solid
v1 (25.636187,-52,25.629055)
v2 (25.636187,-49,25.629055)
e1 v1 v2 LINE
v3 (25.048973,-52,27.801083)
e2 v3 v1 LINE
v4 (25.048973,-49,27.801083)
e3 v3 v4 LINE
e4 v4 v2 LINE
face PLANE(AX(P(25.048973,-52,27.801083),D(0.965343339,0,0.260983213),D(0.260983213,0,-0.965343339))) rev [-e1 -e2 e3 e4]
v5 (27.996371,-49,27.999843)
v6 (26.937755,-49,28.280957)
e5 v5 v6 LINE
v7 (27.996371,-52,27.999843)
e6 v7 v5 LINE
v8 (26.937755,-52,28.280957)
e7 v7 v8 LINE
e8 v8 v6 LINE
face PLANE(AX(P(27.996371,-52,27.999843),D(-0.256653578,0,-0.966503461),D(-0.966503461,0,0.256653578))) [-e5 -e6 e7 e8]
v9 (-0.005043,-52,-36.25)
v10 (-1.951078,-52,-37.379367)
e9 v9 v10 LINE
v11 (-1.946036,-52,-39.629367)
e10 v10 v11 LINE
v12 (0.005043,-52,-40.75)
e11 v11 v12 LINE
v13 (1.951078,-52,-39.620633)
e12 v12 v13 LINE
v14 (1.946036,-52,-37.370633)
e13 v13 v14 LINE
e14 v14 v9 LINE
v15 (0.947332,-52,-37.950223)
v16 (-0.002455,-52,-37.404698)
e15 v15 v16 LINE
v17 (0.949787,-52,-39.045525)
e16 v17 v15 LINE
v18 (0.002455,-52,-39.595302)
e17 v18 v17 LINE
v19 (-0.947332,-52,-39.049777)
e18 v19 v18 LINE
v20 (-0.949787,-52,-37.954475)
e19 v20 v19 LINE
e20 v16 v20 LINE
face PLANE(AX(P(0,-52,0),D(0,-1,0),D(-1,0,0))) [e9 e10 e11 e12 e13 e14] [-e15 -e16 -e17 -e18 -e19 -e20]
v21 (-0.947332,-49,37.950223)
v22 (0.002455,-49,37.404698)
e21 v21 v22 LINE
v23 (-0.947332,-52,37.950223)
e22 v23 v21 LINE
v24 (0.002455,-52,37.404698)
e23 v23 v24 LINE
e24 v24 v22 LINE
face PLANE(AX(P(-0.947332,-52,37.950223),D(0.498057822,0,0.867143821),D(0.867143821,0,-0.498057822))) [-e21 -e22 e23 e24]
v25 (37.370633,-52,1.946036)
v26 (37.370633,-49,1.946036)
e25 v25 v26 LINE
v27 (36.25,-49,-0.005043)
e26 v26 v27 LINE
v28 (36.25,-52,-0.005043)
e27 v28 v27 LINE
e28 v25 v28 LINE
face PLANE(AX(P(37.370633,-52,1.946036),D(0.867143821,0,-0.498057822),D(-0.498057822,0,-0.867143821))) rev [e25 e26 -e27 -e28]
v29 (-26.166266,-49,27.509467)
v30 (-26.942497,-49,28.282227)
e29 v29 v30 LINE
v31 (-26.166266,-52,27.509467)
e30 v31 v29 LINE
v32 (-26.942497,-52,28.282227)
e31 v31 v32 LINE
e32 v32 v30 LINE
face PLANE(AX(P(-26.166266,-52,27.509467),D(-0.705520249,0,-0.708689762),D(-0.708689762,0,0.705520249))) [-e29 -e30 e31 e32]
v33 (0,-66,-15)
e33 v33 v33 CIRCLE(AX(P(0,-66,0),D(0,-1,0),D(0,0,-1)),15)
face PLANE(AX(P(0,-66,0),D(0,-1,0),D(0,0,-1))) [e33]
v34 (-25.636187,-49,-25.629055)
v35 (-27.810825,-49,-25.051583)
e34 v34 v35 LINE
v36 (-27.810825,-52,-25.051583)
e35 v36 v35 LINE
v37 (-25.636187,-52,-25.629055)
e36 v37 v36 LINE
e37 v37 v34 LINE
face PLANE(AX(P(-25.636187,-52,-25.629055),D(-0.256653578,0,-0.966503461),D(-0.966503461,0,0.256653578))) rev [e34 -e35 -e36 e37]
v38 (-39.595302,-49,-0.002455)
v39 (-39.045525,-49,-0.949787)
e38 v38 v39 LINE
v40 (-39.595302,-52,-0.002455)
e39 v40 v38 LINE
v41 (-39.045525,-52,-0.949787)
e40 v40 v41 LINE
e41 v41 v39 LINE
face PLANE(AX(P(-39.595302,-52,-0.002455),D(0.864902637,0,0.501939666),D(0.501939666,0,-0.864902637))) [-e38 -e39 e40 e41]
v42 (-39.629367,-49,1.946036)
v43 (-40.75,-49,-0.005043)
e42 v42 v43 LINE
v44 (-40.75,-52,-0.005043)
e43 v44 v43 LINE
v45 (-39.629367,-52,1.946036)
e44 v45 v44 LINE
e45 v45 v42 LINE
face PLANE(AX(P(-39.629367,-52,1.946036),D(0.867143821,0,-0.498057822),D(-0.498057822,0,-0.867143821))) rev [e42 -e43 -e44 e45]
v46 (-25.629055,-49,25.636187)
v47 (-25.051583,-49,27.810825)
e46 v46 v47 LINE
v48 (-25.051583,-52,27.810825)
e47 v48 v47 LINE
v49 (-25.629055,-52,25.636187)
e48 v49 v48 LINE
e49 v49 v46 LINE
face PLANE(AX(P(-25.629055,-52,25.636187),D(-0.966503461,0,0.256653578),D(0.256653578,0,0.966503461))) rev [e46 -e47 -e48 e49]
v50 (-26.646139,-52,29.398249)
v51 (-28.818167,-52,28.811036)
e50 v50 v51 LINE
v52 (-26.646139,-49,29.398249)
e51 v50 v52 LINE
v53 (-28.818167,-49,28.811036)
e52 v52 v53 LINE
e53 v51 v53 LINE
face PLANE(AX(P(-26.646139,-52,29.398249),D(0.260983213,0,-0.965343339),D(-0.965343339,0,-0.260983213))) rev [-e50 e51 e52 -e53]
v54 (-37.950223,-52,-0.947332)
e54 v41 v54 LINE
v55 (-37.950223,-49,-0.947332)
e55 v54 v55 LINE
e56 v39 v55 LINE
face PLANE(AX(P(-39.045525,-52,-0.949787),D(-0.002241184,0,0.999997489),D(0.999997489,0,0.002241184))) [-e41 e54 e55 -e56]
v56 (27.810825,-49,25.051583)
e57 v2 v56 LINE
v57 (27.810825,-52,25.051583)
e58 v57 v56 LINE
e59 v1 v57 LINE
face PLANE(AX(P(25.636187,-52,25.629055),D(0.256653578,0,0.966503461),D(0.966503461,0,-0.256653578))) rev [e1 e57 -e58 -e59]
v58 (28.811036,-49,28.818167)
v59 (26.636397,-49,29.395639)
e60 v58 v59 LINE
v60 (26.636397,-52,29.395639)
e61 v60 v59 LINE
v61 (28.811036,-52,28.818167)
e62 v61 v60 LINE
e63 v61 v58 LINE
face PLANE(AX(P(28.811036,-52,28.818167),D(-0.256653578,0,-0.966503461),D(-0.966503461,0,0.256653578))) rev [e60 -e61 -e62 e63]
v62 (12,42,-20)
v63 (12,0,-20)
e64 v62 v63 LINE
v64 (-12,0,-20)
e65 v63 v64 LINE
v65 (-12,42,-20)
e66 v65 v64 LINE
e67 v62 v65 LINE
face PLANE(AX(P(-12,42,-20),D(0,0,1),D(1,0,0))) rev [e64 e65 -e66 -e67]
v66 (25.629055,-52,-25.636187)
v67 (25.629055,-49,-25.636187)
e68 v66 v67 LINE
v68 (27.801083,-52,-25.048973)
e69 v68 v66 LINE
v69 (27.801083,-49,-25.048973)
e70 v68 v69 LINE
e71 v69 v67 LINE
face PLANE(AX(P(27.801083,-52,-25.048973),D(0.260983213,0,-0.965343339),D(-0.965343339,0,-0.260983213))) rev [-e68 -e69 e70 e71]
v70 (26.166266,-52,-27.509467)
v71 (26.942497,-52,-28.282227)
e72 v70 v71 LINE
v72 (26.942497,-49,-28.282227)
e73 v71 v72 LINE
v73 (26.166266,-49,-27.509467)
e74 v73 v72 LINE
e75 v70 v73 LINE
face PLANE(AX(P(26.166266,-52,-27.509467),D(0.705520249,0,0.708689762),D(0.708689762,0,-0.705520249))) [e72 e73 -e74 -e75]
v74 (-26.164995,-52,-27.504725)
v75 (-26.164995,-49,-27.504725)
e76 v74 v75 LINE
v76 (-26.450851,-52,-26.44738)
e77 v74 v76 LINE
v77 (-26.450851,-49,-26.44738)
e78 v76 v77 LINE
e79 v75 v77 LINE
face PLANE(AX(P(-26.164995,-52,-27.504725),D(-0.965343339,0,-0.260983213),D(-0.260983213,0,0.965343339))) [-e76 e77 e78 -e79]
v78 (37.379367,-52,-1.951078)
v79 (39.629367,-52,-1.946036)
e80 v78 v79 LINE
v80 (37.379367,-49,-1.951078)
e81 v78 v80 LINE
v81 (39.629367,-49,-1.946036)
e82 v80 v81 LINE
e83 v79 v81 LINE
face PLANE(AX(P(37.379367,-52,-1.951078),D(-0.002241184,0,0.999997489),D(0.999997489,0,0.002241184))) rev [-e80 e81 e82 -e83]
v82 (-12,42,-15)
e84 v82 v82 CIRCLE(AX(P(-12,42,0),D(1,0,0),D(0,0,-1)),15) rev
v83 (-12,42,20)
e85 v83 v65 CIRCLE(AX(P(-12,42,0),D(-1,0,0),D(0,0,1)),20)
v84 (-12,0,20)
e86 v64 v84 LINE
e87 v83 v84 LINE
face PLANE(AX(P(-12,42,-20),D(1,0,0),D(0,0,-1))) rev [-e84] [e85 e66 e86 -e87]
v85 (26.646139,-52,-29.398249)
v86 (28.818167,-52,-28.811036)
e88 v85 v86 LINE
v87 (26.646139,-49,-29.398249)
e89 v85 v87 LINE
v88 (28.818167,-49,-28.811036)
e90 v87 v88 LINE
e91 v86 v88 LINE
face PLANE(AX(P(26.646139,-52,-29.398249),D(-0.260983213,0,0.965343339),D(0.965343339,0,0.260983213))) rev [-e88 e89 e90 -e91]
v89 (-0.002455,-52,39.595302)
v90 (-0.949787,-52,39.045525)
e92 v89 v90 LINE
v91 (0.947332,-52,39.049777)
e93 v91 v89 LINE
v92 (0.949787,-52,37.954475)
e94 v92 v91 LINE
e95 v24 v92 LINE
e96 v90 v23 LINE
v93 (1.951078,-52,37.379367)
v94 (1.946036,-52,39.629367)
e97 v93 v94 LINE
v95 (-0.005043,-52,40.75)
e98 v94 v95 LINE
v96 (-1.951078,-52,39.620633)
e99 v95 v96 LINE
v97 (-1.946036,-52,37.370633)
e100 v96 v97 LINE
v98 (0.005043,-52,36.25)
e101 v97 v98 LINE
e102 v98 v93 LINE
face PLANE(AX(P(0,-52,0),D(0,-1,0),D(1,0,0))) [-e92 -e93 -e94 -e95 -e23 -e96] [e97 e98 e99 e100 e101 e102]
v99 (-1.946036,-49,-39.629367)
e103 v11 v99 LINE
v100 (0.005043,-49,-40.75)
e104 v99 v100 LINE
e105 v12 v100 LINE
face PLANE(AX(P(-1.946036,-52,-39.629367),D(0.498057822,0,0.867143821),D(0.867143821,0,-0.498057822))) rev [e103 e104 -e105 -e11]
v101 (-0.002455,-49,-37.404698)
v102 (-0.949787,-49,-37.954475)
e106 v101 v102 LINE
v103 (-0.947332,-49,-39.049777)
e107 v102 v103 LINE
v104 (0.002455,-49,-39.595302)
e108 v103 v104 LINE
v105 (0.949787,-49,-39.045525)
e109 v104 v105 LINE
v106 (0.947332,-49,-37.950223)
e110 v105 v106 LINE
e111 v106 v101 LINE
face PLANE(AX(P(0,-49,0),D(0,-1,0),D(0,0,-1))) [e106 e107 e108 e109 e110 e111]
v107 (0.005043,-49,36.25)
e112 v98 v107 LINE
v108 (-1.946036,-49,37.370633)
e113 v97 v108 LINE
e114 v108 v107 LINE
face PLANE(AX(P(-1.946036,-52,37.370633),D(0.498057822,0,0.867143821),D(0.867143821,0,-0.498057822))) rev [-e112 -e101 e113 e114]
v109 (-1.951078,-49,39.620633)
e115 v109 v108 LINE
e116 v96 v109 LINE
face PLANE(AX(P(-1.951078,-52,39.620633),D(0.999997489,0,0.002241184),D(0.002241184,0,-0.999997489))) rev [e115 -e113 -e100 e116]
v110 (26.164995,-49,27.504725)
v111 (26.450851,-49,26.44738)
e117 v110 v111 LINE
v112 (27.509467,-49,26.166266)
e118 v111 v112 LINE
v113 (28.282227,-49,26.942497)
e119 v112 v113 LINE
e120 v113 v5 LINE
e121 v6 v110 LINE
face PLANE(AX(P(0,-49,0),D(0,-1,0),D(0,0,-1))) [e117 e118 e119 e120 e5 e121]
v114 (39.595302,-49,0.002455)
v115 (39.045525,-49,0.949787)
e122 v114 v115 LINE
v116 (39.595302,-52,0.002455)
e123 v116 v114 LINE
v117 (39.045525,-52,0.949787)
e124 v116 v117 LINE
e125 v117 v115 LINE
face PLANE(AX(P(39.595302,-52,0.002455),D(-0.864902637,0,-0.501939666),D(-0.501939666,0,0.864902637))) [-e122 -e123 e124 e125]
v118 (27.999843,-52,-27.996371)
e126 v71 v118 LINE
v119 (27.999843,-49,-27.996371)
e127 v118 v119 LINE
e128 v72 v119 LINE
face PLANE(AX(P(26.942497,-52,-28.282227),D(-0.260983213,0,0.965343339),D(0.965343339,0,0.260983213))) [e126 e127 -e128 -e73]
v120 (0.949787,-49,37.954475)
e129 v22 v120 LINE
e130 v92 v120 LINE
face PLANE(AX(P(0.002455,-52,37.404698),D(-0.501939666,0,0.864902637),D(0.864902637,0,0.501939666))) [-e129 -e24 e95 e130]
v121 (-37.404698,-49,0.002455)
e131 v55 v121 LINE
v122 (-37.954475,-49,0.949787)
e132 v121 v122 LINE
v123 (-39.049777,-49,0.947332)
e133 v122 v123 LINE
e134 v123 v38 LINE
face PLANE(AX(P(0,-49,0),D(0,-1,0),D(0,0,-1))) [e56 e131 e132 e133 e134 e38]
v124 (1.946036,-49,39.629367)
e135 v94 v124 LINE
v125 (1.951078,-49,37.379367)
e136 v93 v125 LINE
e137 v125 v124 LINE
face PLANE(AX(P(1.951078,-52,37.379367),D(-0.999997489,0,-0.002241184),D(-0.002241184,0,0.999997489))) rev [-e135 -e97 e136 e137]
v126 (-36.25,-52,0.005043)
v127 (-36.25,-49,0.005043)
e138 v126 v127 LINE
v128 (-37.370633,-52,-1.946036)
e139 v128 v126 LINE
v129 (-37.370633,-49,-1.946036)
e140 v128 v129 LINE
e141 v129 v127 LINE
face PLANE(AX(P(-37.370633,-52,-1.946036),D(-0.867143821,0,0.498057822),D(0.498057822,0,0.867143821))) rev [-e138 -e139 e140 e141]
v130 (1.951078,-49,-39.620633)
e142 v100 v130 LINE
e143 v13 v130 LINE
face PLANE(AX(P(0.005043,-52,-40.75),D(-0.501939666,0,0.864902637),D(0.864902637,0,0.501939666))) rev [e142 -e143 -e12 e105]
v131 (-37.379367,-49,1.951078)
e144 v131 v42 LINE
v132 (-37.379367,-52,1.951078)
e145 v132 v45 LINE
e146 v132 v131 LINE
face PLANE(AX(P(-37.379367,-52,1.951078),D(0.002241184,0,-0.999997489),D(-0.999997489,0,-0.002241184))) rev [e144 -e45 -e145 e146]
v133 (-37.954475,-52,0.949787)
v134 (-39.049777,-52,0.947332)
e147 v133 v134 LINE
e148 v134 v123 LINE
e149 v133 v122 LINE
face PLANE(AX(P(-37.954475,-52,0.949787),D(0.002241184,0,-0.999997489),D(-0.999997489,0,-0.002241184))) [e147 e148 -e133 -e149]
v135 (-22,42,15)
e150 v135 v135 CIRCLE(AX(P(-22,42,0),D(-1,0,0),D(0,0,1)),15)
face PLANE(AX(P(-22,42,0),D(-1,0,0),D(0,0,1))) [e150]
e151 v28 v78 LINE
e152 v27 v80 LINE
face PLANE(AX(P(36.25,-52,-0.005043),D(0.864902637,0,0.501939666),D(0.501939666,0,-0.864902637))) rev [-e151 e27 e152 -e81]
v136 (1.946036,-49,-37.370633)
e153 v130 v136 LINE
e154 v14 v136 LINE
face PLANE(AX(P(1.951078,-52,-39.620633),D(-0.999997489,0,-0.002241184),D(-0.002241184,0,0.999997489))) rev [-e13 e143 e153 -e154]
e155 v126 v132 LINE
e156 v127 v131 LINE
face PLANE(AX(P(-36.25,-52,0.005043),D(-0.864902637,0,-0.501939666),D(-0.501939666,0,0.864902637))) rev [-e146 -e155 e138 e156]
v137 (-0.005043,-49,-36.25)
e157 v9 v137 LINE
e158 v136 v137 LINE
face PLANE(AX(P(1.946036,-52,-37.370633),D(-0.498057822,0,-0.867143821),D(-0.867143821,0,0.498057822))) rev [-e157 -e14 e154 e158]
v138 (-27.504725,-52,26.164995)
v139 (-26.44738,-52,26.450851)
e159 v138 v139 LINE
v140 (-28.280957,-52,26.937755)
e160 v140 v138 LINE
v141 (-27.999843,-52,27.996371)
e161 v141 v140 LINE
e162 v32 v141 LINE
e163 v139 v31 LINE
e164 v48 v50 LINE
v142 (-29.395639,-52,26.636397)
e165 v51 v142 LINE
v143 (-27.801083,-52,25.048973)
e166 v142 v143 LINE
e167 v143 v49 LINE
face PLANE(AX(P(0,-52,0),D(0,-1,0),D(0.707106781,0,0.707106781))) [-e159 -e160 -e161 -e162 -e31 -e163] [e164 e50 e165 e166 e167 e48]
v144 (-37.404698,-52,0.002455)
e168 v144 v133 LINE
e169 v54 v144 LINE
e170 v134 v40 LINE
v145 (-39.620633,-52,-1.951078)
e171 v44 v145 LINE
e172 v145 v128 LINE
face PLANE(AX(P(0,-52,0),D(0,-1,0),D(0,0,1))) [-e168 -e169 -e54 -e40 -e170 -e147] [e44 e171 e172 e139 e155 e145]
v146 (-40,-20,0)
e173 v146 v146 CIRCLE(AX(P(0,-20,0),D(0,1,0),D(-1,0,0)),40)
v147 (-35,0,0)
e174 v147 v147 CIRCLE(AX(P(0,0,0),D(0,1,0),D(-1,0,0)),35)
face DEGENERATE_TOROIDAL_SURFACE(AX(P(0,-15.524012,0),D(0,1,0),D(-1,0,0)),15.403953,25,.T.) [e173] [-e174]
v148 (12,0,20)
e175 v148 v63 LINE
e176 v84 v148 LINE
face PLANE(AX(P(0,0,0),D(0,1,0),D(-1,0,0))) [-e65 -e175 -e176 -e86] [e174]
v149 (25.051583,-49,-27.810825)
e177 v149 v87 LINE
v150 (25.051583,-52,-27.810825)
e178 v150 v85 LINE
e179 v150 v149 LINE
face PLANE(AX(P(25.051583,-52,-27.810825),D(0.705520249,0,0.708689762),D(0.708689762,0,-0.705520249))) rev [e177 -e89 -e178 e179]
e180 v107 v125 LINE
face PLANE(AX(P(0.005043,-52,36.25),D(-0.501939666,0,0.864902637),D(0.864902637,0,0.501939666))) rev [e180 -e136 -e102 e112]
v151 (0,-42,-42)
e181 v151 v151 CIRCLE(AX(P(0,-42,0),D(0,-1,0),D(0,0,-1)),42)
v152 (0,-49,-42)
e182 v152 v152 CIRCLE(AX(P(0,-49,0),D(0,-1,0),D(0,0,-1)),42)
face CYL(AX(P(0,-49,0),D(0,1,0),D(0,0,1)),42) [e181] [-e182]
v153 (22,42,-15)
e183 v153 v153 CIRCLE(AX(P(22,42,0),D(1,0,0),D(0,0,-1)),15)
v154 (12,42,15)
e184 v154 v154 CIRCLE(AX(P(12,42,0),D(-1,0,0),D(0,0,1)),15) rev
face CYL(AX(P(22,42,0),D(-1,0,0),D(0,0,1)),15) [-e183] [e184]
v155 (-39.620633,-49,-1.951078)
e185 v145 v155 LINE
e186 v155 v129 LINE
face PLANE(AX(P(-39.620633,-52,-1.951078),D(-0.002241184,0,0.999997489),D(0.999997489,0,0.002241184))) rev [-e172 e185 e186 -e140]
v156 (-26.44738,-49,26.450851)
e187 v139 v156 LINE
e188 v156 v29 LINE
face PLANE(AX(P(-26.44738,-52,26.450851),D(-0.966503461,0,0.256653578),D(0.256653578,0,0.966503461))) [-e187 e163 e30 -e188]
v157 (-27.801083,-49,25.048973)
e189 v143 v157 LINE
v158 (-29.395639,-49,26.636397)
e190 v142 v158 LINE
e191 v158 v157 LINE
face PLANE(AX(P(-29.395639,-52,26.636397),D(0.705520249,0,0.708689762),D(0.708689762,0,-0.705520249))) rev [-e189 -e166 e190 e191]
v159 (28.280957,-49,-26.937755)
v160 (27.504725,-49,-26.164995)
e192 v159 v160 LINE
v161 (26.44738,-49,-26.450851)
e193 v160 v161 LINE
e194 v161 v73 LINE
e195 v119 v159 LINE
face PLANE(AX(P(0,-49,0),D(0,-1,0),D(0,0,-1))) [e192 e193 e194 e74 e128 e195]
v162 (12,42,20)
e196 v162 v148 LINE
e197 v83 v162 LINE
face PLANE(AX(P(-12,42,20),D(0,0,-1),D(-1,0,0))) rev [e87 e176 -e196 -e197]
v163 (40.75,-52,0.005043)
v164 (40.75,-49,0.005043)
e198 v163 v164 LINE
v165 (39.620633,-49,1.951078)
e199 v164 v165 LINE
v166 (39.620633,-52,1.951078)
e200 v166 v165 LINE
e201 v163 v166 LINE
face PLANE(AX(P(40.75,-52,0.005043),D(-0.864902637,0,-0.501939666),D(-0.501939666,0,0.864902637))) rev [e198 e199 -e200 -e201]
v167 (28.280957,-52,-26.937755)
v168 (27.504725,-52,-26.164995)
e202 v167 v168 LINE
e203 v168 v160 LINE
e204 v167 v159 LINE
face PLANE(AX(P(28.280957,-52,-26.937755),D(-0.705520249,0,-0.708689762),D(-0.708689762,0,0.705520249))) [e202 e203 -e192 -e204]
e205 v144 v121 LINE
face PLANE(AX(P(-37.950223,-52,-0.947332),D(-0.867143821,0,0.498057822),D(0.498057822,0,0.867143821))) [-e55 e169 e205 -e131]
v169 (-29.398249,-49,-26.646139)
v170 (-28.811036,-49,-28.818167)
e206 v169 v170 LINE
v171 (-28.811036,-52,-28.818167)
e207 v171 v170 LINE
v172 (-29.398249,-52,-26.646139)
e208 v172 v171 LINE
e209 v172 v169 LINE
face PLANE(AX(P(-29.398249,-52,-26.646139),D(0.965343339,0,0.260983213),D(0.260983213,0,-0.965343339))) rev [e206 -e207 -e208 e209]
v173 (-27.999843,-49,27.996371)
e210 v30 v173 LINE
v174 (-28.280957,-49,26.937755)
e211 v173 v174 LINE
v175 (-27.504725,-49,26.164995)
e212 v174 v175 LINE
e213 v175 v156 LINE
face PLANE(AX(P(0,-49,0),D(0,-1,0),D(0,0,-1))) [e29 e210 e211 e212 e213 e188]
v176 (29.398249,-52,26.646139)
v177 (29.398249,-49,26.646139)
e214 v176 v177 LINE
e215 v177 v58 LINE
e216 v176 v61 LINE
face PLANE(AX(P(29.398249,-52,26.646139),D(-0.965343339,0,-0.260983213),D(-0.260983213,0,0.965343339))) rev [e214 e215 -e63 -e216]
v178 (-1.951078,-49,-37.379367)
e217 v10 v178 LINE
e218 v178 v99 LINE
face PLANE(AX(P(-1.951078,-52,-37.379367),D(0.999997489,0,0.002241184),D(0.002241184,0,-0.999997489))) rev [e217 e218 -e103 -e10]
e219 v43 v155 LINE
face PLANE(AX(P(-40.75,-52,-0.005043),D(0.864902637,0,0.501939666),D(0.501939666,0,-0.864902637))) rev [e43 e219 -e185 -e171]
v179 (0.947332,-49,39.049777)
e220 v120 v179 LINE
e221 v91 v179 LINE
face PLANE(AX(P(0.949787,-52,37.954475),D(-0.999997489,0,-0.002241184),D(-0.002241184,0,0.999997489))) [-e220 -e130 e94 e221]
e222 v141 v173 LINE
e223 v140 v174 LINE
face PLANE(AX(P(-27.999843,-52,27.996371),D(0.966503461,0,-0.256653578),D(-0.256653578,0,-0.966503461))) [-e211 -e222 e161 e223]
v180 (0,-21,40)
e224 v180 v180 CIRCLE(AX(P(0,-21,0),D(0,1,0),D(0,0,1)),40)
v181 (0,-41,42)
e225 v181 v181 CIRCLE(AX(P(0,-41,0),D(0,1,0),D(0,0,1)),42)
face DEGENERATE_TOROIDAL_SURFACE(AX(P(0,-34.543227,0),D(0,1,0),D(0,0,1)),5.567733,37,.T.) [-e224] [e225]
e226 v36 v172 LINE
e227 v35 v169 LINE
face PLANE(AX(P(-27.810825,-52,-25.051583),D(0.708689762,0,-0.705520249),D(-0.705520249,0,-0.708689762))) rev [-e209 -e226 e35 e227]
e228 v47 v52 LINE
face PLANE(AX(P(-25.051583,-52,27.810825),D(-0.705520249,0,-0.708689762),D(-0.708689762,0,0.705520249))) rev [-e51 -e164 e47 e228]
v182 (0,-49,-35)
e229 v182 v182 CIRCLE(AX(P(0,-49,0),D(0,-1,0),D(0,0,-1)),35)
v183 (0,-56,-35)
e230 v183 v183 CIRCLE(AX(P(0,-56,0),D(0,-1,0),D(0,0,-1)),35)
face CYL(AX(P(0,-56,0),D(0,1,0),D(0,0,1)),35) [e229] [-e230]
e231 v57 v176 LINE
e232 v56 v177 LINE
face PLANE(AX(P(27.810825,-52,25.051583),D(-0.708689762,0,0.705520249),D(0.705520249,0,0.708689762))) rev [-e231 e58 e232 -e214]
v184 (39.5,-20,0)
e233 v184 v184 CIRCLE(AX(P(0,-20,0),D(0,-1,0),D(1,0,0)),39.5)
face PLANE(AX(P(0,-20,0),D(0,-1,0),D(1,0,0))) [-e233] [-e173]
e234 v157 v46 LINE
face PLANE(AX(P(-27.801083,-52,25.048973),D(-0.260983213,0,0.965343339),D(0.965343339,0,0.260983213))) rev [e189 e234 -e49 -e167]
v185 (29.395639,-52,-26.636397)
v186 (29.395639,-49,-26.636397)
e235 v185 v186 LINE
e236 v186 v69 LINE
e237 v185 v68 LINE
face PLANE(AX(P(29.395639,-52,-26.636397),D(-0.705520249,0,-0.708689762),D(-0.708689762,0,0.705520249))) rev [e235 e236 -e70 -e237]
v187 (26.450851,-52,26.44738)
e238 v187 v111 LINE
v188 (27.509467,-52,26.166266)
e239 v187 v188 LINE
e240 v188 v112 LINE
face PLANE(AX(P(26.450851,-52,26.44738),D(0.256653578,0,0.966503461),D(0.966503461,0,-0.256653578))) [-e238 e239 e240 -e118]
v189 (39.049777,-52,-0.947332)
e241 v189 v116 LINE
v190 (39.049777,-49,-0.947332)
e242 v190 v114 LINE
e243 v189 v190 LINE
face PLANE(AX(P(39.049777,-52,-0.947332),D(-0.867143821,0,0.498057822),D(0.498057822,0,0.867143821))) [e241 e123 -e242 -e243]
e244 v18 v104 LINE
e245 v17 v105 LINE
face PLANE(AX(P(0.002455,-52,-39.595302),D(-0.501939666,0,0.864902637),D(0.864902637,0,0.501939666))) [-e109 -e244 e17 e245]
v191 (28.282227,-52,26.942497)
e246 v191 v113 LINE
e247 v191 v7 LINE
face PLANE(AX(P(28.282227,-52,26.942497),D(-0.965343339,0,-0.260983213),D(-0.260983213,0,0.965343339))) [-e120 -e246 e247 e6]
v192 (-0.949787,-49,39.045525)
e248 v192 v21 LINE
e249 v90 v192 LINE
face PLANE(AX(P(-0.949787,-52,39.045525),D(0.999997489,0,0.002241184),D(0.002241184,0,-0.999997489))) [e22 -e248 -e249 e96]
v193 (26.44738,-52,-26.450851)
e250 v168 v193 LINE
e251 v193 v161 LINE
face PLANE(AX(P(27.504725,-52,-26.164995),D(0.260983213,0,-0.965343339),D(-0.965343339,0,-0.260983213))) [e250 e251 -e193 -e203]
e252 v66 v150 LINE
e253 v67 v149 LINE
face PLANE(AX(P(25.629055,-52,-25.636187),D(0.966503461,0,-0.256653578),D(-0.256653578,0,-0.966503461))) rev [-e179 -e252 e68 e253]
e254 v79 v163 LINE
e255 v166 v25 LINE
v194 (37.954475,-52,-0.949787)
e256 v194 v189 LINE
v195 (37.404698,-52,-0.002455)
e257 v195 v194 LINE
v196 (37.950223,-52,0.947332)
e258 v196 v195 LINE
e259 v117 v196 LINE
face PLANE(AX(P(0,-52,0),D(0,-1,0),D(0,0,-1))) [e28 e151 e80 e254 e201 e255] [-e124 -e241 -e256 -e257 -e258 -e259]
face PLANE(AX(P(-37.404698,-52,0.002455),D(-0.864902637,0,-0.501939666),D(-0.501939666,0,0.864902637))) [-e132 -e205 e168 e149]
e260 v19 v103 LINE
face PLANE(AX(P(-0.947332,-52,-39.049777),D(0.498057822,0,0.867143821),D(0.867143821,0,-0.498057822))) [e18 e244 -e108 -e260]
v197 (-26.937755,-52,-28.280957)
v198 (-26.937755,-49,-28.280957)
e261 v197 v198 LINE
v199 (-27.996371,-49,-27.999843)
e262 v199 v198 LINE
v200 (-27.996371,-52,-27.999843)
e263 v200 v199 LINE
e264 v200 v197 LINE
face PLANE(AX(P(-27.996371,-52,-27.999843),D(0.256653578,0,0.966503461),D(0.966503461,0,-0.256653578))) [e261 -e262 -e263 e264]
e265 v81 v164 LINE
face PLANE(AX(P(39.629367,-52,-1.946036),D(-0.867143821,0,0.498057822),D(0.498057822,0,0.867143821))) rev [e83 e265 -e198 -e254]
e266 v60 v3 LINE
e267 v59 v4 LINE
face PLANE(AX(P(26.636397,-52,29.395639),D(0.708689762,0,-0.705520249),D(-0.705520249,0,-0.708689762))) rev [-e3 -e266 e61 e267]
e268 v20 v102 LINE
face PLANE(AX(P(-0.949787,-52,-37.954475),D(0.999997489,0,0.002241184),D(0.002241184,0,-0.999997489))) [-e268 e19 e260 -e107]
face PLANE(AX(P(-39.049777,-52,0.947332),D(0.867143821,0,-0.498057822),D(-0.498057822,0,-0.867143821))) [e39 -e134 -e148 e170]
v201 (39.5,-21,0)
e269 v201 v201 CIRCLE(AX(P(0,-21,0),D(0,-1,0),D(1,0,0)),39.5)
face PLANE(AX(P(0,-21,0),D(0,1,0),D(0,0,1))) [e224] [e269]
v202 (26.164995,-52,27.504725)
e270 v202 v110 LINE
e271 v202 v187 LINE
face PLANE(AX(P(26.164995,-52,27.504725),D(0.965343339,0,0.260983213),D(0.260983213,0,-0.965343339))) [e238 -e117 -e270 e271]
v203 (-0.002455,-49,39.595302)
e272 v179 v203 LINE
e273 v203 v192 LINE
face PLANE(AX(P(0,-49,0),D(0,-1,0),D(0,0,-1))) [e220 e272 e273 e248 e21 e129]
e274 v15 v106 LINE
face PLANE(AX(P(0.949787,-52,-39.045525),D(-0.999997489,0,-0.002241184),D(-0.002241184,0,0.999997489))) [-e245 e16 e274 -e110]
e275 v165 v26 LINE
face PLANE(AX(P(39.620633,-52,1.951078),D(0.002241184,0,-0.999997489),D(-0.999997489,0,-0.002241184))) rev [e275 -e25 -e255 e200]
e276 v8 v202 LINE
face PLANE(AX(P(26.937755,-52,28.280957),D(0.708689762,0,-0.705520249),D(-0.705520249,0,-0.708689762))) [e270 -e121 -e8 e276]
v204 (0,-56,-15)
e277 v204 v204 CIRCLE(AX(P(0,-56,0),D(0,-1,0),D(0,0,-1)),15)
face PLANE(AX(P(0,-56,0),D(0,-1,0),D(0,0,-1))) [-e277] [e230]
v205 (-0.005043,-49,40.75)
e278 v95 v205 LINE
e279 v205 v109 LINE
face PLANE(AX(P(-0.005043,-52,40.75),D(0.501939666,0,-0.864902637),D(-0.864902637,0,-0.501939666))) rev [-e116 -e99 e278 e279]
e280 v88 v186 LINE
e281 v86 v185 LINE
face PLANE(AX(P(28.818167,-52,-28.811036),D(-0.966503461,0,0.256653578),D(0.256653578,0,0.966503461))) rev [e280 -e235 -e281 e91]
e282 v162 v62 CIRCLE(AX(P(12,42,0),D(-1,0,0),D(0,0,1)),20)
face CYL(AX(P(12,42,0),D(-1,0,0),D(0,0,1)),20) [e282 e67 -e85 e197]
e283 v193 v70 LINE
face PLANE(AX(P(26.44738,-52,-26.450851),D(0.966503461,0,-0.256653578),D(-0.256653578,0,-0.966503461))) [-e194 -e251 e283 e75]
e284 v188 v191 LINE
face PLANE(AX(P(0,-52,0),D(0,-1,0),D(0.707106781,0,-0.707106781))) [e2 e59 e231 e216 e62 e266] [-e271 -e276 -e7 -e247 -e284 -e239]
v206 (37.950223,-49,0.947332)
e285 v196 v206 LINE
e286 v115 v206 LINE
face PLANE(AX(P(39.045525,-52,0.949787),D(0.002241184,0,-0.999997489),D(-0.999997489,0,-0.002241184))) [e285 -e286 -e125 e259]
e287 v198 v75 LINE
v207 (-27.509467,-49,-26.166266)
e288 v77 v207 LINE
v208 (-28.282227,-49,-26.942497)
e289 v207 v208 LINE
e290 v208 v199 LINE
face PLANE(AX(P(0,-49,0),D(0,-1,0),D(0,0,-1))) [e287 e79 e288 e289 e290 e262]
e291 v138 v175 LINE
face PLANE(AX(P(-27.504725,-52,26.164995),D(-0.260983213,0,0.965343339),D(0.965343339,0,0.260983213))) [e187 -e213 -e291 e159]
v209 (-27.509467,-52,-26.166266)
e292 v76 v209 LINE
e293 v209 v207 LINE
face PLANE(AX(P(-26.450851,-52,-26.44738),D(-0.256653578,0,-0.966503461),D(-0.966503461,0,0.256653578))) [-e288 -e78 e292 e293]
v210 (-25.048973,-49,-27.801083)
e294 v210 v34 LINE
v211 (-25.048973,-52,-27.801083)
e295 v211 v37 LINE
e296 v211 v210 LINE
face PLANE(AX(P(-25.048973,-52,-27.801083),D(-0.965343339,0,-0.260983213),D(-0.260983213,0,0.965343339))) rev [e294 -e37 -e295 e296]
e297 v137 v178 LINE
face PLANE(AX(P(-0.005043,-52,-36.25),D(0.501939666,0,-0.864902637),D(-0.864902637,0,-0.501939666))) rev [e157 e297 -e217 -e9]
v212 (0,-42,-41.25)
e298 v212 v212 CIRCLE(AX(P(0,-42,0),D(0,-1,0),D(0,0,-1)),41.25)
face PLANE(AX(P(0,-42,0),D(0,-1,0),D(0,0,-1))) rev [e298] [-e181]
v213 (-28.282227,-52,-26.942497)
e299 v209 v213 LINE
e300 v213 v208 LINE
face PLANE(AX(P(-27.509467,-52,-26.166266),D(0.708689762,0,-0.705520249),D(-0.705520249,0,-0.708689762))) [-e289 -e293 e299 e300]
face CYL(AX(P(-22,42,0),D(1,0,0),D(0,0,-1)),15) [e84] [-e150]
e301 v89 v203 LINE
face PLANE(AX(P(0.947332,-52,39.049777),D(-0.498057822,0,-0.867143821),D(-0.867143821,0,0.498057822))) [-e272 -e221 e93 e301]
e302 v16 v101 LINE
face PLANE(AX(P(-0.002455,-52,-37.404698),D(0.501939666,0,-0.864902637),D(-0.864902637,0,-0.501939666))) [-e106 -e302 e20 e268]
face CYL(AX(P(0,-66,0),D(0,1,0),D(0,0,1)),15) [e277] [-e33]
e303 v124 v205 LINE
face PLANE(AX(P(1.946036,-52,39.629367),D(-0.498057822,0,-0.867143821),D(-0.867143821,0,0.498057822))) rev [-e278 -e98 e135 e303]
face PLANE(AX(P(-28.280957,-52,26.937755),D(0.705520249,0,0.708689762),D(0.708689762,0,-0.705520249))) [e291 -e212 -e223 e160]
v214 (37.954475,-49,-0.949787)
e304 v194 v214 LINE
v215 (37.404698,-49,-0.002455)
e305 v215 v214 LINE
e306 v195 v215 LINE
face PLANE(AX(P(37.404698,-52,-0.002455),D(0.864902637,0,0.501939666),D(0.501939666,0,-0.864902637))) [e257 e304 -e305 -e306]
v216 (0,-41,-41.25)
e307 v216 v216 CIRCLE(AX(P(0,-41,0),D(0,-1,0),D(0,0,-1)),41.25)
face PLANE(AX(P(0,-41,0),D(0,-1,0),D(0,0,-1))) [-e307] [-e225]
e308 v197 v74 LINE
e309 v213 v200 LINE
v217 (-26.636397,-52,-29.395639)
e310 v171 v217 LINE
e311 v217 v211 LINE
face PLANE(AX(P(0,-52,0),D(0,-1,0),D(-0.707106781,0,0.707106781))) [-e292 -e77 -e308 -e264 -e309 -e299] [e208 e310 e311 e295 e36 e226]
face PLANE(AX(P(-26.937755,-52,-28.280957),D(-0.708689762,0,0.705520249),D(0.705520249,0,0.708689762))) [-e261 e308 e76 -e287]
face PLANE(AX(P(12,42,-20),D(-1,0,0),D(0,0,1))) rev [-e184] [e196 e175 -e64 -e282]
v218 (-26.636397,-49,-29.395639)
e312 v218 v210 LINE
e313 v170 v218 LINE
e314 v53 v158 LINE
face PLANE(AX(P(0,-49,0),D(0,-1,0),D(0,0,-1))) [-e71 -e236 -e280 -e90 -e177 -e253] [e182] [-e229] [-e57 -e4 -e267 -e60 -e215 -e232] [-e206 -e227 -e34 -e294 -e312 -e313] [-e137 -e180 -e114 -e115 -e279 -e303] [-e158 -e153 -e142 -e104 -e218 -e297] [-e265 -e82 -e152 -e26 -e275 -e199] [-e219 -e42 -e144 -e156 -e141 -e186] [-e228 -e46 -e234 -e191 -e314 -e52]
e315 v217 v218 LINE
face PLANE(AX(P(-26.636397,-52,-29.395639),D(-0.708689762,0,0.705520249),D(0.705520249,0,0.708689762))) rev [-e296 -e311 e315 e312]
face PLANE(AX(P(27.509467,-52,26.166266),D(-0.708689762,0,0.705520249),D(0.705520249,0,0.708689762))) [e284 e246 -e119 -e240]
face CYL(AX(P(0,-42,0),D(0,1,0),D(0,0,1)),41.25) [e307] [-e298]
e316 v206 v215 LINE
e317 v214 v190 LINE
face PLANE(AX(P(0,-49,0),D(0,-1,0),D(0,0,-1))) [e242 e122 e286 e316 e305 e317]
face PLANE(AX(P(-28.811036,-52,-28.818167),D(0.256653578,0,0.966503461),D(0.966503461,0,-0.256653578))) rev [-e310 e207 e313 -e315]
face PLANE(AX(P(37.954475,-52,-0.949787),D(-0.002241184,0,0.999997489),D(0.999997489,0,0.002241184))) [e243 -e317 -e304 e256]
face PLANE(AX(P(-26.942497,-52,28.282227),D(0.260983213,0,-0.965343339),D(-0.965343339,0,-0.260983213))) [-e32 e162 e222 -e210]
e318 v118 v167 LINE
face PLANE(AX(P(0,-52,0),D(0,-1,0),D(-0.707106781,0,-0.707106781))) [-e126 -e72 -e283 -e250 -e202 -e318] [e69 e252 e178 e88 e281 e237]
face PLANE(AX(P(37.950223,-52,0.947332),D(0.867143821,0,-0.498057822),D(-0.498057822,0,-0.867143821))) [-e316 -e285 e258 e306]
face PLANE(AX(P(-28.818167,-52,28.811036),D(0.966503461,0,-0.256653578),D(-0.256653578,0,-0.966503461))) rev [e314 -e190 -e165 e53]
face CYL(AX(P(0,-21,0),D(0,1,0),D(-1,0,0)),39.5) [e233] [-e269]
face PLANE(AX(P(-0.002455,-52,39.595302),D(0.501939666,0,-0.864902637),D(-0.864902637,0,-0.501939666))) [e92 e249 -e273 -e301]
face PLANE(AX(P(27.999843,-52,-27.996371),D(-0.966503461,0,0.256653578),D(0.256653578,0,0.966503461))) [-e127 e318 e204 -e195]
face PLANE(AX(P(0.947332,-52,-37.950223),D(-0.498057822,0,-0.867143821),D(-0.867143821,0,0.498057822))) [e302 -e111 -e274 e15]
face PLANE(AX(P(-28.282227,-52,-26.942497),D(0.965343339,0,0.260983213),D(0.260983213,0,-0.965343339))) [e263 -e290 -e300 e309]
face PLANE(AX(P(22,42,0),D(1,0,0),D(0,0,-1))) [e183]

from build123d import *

# Parameters (mm, degrees)
ESQUISSE2_R                  = 39.5
BOSS_EXTRU_1_DEPTH           = 1
ESQUISSE4_R                  = 41.25
BOSS_EXTRU_2_DEPTH           = 1
ESQUISSE5_R                  = 42
BOSS_EXTRU_3_DEPTH           = 7
ESQUISSE6_R                  = 35
BOSS_EXTRU_4_DEPTH           = 7
BOSS_EXTRU_7_DEPTH           = 3
R_P_TITION_START             = -52
R_P_TITION_CIRCULAIRE1_DEPTH = 3
ESQUISSE8_R                  = 15
BOSS_EXTRU_8_DEPTH           = 10
ESQUISSE9_W                  = 24
ESQUISSE9_H                  = 40
BOSS_EXTRU_9_DEPTH           = 42
BOSS_EXTRU_10_DEPTH          = 24
ESQUISSE11_R                 = 15
BOSS_EXTRU_11_DEPTH          = 10
BOSS_EXTRU_12_START          = 10
ESQUISSE12_R                 = 15
BOSS_EXTRU_12_DEPTH          = 10


# Read off the part's stored shape, not the designer's step: Répétition circulaire1
with BuildPart() as part:
    # Esquisse1 → Révolution1 (revolve)
    with BuildSketch(Plane.XY):
        with BuildLine():
            Line((0, 0), (-35, 0))
            ThreePointArc((-35, 0), (-39.657515479, -9.46062113), (-40, -20))
            Line((-40, -20), (0, -20))
            Line((0, -20), (0, 0))
        make_face()
    revolve(axis=Axis((0, 0, 0), (0, -1, 0)))

    # Esquisse2 → Boss.-Extru.1 (add)
    with BuildSketch(Plane.XZ.offset(20)):
        Circle(ESQUISSE2_R)
    extrude(amount=BOSS_EXTRU_1_DEPTH)

    # Esquisse3 → Révolution2 (revolve)
    with BuildSketch(Plane(origin=(0, 0, 0), x_dir=(0, 0, -1), z_dir=(1, 0, 0)), mode=Mode.PRIVATE) as r_volution2_sk:
        with BuildLine():
            Line((0, -21), (-40, -21))
            ThreePointArc((-40, -21), (-42.384109041, -30.861589096), (-42, -41))
            Line((-42, -41), (0, -41))
            Line((0, -41), (0, -21))
        make_face()
    revolve(r_volution2_sk.sketch.rotate(Axis((0, -21, 0), (0, -1, 0)), 90), axis=Axis((0, -21, 0), (0, -1, 0)))

    # Esquisse4 → Boss.-Extru.2 (add)
    with BuildSketch(Plane.XZ.offset(41)):
        with Locations(Location((0, 0, 0), (0, 0, 270))):
            Circle(ESQUISSE4_R)
    extrude(amount=BOSS_EXTRU_2_DEPTH)

    # Esquisse5 → Boss.-Extru.3 (add)
    with BuildSketch(Plane.XZ.offset(42)):
        with Locations(Location((0, 0, 0), (0, 0, 270))):
            Circle(ESQUISSE5_R)
    extrude(amount=BOSS_EXTRU_3_DEPTH)

    # Esquisse6 → Boss.-Extru.4 (add)
    with BuildSketch(Plane.XZ.offset(49)):
        with Locations(Location((0, 0, 0), (0, 0, 270))):
            Circle(ESQUISSE6_R)
    extrude(amount=BOSS_EXTRU_4_DEPTH)

    # Esquisse7 → Boss.-Extru.7 (add)
    with BuildSketch(Plane.XZ.offset(49)):
        Polygon((39.629367086, -1.94603582), (40.75, 0.005042677), (39.620632914, 1.951078497), (37.370632914, 1.94603582), (36.25, -0.005042677), (37.379367086, -1.951078497), align=None)
        Polygon((39.045525279, 0.94978706), (37.950222917, 0.94733228), (37.404697638, -0.00245478), (37.954474721, -0.94978706), (39.049777083, -0.94733228), (39.595302362, 0.00245478), align=None, mode=Mode.SUBTRACT)
    extrude(amount=BOSS_EXTRU_7_DEPTH)

    # Répétition circulaire1 outline → Répétition circulaire1 (add)
    # profile 1 of 7: a face of its own
    with BuildSketch(Plane(origin=(0, 0, 0), x_dir=(1, 0, 0), z_dir=(0, 1, 0)).offset(R_P_TITION_START)):
        Polygon((29.398249326, -26.646139076), (27.810824779, -25.051583107), (25.636186529, -25.629055107), (25.048972826, -27.801083076), (26.636397373, -29.395639044), (28.811035623, -28.818167044), align=None)
        Polygon((28.282227258, -26.9424971), (27.996371011, -27.999842595), (26.937754829, -28.28095657), (26.164994893, -27.504725051), (26.45085114, -26.447379557), (27.509467323, -26.166265581), align=None, mode=Mode.SUBTRACT)
    # profile 2 of 7: a face of its own
    with BuildSketch(Plane(origin=(0, 0, 0), x_dir=(1, 0, 0), z_dir=(0, 1, 0)).offset(R_P_TITION_START)):
        Polygon((26.646139076, 29.398249326), (25.051583107, 27.810824779), (25.629055107, 25.636186529), (27.801083076, 25.048972826), (29.395639044, 26.636397373), (28.818167044, 28.811035623), align=None)
        Polygon((26.9424971, 28.282227258), (27.999842595, 27.996371011), (28.28095657, 26.937754829), (27.504725051, 26.164994893), (26.447379557, 26.45085114), (26.166265581, 27.509467323), align=None, mode=Mode.SUBTRACT)
    # profile 3 of 7: a face of its own
    with BuildSketch(Plane(origin=(0, 0, 0), x_dir=(1, 0, 0), z_dir=(0, 1, 0)).offset(R_P_TITION_START)):
        Polygon((-1.94603582, 39.629367086), (-1.951078497, 37.379367086), (-0.005042677, 36.25), (1.94603582, 37.370632914), (1.951078497, 39.620632914), (0.005042677, 40.75), align=None)
        Polygon((-0.94733228, 39.049777083), (0.00245478, 39.595302362), (0.94978706, 39.045525279), (0.94733228, 37.950222917), (-0.00245478, 37.404697638), (-0.94978706, 37.954474721), align=None, mode=Mode.SUBTRACT)
    # profile 4 of 7: a face of its own
    with BuildSketch(Plane(origin=(0, 0, 0), x_dir=(1, 0, 0), z_dir=(0, 1, 0)).offset(R_P_TITION_START)):
        Polygon((-29.398249326, 26.646139076), (-27.810824779, 25.051583107), (-25.636186529, 25.629055107), (-25.048972826, 27.801083076), (-26.636397373, 29.395639044), (-28.811035623, 28.818167044), align=None)
        Polygon((-28.282227258, 26.9424971), (-27.996371011, 27.999842595), (-26.937754829, 28.28095657), (-26.164994893, 27.504725051), (-26.45085114, 26.447379557), (-27.509467323, 26.166265581), align=None, mode=Mode.SUBTRACT)
    # profile 5 of 7: a face of its own
    with BuildSketch(Plane(origin=(0, 0, 0), x_dir=(1, 0, 0), z_dir=(0, 1, 0)).offset(R_P_TITION_START)):
        Polygon((-39.629367086, -1.94603582), (-37.379367086, -1.951078497), (-36.25, -0.005042677), (-37.370632914, 1.94603582), (-39.620632914, 1.951078497), (-40.75, 0.005042677), align=None)
        Polygon((-39.049777083, -0.94733228), (-39.595302362, 0.00245478), (-39.045525279, 0.94978706), (-37.950222917, 0.94733228), (-37.404697638, -0.00245478), (-37.954474721, -0.94978706), align=None, mode=Mode.SUBTRACT)
    # profile 6 of 7: a face of its own
    with BuildSketch(Plane(origin=(0, 0, 0), x_dir=(1, 0, 0), z_dir=(0, 1, 0)).offset(R_P_TITION_START)):
        Polygon((-26.646139076, -29.398249326), (-25.051583107, -27.810824779), (-25.629055107, -25.636186529), (-27.801083076, -25.048972826), (-29.395639044, -26.636397373), (-28.818167044, -28.811035623), align=None)
        Polygon((-26.9424971, -28.282227258), (-27.999842595, -27.996371011), (-28.28095657, -26.937754829), (-27.504725051, -26.164994893), (-26.447379557, -26.45085114), (-26.166265581, -27.509467323), align=None, mode=Mode.SUBTRACT)
    # profile 7 of 7: a face of its own
    with BuildSketch(Plane(origin=(0, 0, 0), x_dir=(1, 0, 0), z_dir=(0, 1, 0)).offset(R_P_TITION_START)):
        Polygon((1.94603582, -39.629367086), (1.951078497, -37.379367086), (0.005042677, -36.25), (-1.94603582, -37.370632914), (-1.951078497, -39.620632914), (-0.005042677, -40.75), align=None)
        Polygon((0.94733228, -39.049777083), (-0.00245478, -39.595302362), (-0.94978706, -39.045525279), (-0.94733228, -37.950222917), (0.00245478, -37.404697638), (0.94978706, -37.954474721), align=None, mode=Mode.SUBTRACT)
    extrude(amount=R_P_TITION_CIRCULAIRE1_DEPTH)

    # Esquisse8 → Boss.-Extru.8 (add)
    with BuildSketch(Plane.XZ.offset(56)):
        with Locations(Location((0, 0, 0), (0, 0, 270))):
            Circle(ESQUISSE8_R)
    extrude(amount=BOSS_EXTRU_8_DEPTH)

    # Esquisse9 → Boss.-Extru.9 (add)
    with BuildSketch(Plane(origin=(0, 0, 0), x_dir=(1, 0, 0), z_dir=(0, 1, 0))):
        Rectangle(ESQUISSE9_W, ESQUISSE9_H)
    extrude(amount=BOSS_EXTRU_9_DEPTH)

    # Esquisse10 → Boss.-Extru.10 (add)
    with BuildSketch(Plane.ZY.offset(12)):
        with BuildLine():
            Line((-20, 42), (20, 42))
            ThreePointArc((20, 42), (0, 62), (-20, 42))
        make_face()
    extrude(amount=-BOSS_EXTRU_10_DEPTH)

    # Esquisse11 → Boss.-Extru.11 (add)
    with BuildSketch(Plane(origin=(12, 0, 0), x_dir=(0, 0, -1), z_dir=(1, 0, 0))):
        with Locations(Location((0, 42, 0), (0, 0, 180))):
            Circle(ESQUISSE11_R)
    extrude(amount=BOSS_EXTRU_11_DEPTH)

    # Esquisse12 → Boss.-Extru.12 (add)
    with BuildSketch(Plane.ZY.offset(12).offset(BOSS_EXTRU_12_START)):
        with Locations((0, 42)):
            Circle(ESQUISSE12_R)
    extrude(amount=-BOSS_EXTRU_12_DEPTH)


solid = part.part
